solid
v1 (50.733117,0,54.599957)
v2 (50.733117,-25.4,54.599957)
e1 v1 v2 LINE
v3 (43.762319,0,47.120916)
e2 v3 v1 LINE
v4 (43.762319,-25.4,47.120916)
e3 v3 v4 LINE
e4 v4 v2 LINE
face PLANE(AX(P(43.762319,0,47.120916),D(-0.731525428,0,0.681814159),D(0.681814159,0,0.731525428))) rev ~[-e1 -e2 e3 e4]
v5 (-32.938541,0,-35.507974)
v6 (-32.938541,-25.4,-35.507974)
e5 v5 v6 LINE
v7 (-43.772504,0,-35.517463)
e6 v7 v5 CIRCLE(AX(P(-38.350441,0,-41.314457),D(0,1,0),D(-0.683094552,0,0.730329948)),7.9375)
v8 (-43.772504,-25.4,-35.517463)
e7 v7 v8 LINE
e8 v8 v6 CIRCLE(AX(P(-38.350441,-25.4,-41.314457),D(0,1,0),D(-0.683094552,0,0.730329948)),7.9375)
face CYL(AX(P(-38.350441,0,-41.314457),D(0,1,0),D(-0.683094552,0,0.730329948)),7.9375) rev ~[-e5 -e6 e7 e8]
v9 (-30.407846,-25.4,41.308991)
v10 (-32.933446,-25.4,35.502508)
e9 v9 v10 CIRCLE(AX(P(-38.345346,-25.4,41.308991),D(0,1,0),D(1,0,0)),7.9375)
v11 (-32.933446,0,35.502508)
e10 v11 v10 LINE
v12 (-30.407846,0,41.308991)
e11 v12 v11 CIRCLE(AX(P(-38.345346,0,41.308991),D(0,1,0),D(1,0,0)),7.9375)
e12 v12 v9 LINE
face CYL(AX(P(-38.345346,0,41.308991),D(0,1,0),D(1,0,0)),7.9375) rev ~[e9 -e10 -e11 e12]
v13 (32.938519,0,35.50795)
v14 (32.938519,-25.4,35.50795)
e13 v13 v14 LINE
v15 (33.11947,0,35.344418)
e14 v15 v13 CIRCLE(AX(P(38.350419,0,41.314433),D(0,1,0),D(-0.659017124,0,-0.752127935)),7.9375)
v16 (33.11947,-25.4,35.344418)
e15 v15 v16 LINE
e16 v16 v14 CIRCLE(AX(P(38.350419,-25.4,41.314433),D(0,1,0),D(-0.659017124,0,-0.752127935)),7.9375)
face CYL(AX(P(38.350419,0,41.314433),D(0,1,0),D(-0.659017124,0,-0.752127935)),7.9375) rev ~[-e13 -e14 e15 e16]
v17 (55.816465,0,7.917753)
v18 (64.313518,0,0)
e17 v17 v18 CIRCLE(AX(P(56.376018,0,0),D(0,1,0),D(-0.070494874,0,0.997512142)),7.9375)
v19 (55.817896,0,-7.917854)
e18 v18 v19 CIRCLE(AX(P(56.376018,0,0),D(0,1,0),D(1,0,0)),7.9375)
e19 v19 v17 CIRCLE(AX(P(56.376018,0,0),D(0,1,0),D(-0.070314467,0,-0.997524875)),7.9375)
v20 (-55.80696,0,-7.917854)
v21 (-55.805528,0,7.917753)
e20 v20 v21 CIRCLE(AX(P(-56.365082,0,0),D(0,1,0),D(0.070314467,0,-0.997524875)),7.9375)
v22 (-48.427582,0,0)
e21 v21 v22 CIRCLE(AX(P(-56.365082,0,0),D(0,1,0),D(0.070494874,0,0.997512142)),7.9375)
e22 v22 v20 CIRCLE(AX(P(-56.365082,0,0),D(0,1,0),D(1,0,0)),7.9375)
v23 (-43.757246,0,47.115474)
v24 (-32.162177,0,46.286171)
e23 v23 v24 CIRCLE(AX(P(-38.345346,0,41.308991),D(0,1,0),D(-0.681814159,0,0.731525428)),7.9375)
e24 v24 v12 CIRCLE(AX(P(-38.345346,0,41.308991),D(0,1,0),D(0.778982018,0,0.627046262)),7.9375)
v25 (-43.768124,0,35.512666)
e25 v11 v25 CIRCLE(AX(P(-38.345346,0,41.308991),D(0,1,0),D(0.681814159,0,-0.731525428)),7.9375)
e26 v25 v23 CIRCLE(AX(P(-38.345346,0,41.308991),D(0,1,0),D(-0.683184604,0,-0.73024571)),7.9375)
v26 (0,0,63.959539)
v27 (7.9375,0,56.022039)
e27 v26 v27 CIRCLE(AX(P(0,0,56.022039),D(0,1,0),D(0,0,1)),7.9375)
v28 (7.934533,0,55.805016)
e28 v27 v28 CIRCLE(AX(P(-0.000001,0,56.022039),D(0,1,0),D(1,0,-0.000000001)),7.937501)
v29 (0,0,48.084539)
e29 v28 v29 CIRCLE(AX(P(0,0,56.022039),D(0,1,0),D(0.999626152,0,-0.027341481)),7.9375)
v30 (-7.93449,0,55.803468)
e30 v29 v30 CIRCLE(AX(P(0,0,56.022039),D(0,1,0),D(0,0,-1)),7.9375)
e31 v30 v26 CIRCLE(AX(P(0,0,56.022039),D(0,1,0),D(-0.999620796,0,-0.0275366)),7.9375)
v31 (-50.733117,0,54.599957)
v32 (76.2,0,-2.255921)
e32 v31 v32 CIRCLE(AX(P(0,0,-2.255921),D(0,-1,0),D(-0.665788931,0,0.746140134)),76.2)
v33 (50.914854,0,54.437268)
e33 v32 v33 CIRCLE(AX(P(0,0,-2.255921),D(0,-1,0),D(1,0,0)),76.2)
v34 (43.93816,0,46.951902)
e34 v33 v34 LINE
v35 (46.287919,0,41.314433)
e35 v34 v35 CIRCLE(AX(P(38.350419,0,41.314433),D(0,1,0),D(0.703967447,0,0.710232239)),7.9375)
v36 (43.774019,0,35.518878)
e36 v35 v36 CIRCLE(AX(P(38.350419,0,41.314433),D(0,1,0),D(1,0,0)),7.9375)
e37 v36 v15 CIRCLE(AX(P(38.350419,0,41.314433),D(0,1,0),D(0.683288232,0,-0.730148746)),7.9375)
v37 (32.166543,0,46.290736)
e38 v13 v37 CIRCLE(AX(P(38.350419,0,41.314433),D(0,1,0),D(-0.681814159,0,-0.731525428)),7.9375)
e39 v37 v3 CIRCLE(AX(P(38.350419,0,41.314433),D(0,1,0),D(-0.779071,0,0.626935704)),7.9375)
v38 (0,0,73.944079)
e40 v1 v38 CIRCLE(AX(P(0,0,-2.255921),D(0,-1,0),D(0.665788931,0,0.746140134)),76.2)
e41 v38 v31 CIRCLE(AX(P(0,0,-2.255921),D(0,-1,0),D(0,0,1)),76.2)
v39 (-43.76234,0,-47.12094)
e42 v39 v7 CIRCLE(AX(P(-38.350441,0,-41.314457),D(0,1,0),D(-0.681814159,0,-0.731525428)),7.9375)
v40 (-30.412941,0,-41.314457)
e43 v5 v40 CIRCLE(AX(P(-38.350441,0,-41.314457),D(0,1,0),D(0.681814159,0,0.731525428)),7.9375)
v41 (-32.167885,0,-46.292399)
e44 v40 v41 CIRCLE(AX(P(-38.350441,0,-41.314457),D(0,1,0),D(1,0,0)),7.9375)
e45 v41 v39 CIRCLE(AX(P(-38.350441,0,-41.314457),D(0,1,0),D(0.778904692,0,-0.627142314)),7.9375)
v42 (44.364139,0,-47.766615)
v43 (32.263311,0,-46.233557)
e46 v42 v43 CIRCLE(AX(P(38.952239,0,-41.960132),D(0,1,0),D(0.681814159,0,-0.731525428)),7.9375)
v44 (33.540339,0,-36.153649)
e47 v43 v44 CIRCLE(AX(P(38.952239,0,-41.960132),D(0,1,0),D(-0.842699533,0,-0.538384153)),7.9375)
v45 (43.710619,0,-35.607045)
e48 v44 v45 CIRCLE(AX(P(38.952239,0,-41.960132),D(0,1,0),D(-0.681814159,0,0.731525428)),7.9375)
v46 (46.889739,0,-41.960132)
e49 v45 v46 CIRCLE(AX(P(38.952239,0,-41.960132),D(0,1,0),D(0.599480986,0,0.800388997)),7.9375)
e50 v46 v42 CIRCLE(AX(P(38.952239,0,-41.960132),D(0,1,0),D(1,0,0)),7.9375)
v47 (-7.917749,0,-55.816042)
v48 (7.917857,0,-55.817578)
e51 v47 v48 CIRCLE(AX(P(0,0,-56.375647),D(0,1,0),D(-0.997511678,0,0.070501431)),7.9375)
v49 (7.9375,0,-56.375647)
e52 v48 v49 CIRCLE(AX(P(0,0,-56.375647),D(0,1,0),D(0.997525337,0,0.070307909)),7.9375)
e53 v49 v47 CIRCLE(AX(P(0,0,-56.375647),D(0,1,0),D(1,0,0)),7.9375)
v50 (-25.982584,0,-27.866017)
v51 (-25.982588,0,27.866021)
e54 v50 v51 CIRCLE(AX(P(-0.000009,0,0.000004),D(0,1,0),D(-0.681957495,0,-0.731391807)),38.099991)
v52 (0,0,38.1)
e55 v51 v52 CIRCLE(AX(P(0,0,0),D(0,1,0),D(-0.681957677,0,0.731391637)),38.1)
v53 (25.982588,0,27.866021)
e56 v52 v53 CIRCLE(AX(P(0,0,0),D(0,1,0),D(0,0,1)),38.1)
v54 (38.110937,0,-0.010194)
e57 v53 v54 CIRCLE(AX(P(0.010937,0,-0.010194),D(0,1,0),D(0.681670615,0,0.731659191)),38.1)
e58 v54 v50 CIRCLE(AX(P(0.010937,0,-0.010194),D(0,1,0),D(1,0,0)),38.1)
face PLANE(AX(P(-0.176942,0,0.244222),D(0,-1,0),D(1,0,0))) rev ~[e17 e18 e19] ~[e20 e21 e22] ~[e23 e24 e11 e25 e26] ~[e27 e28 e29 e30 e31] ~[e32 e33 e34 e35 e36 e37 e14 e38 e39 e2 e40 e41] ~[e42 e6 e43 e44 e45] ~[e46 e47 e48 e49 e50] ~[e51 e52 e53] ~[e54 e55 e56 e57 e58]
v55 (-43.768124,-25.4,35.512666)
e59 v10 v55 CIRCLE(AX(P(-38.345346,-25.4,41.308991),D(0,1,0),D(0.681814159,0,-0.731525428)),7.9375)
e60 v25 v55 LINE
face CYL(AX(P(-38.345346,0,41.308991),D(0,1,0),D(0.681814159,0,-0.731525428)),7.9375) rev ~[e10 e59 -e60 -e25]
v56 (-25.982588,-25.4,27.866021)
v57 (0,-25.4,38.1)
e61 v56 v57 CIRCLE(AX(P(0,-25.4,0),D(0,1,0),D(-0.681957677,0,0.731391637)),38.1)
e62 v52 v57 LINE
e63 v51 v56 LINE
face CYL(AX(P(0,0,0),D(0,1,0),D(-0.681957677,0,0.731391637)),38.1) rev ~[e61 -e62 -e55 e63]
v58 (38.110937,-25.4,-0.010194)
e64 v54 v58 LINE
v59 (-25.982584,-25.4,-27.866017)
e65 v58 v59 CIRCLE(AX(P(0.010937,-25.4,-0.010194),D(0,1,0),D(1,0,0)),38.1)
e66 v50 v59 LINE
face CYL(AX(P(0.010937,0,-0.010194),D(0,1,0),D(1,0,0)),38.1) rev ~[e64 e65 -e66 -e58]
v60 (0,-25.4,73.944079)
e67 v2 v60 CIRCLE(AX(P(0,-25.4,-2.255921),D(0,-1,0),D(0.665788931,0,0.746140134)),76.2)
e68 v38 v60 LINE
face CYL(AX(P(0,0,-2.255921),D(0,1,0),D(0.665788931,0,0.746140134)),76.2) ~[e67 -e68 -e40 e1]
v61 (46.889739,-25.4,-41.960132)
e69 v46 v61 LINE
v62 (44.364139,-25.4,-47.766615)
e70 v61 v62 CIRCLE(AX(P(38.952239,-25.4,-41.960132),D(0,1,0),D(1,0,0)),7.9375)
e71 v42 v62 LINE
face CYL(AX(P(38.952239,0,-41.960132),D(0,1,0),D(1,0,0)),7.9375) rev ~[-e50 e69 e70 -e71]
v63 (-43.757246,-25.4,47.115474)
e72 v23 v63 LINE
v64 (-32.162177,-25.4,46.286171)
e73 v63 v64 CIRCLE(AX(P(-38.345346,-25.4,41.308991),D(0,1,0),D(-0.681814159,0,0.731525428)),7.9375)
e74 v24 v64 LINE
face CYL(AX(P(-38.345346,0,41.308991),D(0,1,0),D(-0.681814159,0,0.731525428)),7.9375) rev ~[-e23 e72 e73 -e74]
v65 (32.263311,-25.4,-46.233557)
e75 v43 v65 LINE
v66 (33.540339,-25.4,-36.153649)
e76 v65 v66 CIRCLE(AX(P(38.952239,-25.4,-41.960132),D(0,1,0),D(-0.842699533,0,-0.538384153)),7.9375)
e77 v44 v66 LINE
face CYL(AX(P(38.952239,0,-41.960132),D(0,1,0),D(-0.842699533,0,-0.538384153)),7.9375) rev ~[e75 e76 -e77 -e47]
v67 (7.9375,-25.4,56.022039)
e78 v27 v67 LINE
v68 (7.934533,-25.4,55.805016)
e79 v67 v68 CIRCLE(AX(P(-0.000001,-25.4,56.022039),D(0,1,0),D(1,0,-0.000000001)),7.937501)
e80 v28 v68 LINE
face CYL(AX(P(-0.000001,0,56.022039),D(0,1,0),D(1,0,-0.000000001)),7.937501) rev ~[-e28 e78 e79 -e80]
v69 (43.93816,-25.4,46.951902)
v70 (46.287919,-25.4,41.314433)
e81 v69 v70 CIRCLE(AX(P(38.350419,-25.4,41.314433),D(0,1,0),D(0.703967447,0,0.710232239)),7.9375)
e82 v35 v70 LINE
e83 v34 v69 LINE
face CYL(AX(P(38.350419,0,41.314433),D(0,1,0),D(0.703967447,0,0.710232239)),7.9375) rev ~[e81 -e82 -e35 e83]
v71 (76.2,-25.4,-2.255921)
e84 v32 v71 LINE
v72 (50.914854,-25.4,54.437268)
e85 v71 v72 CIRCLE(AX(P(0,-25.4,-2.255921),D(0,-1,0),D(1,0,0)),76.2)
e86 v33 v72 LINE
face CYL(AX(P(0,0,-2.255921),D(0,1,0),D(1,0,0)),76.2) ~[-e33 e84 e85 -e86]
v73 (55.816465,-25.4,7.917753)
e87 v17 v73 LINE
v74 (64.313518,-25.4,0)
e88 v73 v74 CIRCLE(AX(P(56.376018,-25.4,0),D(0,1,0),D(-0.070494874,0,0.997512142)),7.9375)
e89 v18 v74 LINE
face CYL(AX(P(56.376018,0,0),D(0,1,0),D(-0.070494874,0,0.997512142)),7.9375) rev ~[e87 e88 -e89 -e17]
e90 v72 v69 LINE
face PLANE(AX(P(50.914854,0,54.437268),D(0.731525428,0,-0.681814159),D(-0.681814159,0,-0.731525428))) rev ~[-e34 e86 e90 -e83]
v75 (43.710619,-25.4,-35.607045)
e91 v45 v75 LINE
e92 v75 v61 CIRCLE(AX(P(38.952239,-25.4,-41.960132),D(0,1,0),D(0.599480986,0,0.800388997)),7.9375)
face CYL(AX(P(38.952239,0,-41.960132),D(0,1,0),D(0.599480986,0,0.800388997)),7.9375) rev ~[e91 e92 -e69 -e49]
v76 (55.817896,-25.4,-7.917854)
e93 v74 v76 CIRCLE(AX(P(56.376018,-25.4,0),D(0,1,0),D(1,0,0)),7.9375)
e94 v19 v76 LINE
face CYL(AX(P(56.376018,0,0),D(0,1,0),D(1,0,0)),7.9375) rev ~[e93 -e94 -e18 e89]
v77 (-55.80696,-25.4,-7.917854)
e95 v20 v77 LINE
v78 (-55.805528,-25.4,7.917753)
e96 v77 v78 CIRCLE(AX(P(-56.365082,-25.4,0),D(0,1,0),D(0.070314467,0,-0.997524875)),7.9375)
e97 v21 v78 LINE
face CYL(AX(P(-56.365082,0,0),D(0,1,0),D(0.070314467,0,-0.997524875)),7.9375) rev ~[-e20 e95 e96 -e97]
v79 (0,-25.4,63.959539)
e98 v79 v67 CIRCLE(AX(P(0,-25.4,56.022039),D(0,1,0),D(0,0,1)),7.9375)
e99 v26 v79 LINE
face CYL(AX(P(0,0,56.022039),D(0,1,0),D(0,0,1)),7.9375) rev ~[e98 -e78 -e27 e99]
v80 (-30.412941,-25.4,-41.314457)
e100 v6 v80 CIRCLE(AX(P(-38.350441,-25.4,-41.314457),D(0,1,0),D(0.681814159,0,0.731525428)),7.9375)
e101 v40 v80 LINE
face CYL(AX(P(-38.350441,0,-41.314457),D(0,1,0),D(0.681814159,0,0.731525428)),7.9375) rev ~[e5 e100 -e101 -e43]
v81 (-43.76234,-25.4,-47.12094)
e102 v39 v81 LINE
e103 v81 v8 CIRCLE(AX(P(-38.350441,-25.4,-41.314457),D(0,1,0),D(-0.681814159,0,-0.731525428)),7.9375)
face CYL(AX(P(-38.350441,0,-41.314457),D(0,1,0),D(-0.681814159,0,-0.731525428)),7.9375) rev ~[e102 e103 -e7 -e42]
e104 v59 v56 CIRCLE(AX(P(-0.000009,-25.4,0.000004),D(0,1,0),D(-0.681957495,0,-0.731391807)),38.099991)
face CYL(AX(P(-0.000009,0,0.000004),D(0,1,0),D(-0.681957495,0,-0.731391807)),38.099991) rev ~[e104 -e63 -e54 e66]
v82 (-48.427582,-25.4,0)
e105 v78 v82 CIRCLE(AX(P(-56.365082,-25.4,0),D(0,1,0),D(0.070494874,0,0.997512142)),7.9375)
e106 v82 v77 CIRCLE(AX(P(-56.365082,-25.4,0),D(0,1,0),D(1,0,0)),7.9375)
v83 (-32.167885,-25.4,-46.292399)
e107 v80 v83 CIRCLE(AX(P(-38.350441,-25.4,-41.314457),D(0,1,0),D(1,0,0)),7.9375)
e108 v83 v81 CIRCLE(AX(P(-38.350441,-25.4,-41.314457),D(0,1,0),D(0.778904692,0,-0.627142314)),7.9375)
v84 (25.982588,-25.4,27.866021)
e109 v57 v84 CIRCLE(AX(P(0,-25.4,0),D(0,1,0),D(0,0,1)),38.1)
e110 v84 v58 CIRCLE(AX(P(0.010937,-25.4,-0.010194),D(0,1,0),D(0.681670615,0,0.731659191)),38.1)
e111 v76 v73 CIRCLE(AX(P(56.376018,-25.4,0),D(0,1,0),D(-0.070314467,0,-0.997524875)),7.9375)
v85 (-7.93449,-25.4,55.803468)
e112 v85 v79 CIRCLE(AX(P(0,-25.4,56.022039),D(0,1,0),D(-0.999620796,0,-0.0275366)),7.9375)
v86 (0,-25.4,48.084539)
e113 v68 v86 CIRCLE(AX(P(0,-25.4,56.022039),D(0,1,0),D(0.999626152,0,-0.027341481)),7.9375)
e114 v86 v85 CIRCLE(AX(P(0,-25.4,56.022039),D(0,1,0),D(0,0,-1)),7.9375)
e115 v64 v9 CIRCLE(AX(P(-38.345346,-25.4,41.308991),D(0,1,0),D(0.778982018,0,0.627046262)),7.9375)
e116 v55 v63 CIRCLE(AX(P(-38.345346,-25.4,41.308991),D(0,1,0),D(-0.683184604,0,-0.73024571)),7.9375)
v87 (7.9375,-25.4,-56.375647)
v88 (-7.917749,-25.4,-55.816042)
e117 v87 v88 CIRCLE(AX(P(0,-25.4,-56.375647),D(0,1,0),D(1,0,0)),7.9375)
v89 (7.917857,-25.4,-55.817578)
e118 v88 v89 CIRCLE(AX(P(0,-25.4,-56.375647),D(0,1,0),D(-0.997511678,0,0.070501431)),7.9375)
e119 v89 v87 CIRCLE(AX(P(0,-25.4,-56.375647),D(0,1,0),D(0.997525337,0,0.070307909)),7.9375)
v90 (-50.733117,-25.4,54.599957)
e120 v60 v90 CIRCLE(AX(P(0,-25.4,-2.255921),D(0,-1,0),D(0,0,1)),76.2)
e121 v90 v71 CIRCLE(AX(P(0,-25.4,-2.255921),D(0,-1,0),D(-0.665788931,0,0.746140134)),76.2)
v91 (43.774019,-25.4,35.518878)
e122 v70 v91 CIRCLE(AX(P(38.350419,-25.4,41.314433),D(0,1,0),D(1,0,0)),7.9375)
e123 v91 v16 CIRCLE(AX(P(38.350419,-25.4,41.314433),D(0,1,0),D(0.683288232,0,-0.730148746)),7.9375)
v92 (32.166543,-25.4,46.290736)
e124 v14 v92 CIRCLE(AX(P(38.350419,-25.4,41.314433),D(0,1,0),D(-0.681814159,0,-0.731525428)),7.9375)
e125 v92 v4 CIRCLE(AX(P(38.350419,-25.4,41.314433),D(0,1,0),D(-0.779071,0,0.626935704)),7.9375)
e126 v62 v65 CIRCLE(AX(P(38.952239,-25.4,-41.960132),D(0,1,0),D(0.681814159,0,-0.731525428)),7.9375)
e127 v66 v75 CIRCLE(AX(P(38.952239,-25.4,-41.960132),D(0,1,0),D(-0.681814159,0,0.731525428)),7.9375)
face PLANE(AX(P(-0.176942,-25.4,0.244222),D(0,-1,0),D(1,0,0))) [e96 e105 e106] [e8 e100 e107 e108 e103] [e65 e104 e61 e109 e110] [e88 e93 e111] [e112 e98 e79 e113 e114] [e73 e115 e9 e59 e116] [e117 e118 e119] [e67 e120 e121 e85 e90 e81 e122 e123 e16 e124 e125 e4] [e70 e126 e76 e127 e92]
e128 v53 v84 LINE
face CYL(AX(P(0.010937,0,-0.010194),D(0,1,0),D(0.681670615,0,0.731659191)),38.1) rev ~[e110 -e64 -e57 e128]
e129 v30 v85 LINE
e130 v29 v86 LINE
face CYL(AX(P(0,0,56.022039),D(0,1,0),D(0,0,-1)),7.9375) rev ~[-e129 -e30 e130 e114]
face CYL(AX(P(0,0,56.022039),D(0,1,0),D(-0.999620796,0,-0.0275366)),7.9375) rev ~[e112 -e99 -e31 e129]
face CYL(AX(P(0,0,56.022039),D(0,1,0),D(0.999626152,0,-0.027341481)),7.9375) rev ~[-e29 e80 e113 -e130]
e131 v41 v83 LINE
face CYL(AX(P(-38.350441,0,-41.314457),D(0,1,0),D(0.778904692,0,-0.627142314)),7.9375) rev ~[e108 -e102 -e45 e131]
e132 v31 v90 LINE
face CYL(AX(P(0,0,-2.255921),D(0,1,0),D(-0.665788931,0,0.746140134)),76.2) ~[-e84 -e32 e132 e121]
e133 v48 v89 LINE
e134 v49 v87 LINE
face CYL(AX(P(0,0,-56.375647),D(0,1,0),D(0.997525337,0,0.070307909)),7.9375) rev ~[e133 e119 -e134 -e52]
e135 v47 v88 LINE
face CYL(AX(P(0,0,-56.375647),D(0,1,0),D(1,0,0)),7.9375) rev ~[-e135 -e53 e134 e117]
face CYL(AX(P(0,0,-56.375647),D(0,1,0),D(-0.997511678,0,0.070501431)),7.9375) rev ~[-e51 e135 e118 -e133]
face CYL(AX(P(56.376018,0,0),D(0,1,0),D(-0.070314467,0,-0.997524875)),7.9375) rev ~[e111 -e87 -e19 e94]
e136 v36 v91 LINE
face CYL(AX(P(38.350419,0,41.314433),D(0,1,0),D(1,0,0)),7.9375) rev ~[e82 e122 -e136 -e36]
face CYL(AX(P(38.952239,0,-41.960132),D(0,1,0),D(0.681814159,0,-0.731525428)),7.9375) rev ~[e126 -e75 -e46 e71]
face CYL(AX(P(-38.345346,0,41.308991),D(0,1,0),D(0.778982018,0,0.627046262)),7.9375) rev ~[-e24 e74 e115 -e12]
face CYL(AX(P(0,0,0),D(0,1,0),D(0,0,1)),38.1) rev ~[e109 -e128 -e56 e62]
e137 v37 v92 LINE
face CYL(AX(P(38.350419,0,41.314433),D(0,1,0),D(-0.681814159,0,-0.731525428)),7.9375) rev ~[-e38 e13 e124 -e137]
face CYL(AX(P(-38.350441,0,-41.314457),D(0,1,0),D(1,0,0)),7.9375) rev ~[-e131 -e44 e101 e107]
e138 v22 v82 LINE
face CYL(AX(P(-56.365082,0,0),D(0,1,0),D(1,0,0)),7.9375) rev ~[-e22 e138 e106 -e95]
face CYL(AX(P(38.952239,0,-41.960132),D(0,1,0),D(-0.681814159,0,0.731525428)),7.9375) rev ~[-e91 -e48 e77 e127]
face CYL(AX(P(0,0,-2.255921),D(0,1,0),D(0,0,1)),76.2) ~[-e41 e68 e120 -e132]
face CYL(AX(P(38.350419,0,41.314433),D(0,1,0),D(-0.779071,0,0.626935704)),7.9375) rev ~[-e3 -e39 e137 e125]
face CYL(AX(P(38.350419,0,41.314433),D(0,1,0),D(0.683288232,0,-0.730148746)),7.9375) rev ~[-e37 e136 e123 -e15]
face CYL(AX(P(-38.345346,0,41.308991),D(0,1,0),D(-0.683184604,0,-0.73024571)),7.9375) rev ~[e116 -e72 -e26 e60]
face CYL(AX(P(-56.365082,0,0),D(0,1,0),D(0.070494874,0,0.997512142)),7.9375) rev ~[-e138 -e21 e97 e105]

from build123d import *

# Parameters (mm, degrees)
F1_DEPTH = 25.4


# Not quite as in the source:
# - ends of sketch curves that miss each other by under 0.0002 mm in the source are joined


with BuildPart() as f1:
    # F0 (on Front) → F1 (new body)
    with BuildSketch(Plane.XZ):
        with BuildLine():
            ThreePointArc((7.9345325801, 55.8050164826), (5.535399088, 50.3331676174), (0, 48.0845394904))
            ThreePointArc((0, 48.0845394904), (-5.53484385, 50.3326274112), (-7.9344900677, 55.8034677281))
            ThreePointArc((-7.9344900677, 55.8034677281), (-20.6052011609, 52.4624086595), (-32.1621766165, 46.2861708383))
            ThreePointArc((-32.1621766165, 46.2861708383), (-30.8592654267, 43.9476457313), (-30.4078463876, 41.3089911317))
            ThreePointArc((-30.4078463876, 41.3089911317), (-31.0665806395, 38.1430038554), (-32.9334464969, 35.5025080461))
            ThreePointArc((-32.9334464969, 35.5025080461), (-38.3527879746, 33.37149462), (-43.7681241803, 35.5126658077))
            ThreePointArc((-43.7681241803, 35.5126658077), (-51.6631141521, 22.5336801806), (-55.8055284532, 7.9177526246))
            ThreePointArc((-55.8055284532, 7.9177526246), (-50.5579583584, 5.4112130729), (-48.4275815127, 0))
            ThreePointArc((-48.4275815127, 0), (-50.5584477046, -5.4117381745), (-55.8069604277, -7.917853693))
            ThreePointArc((-55.8069604277, -7.917853693), (-51.6665413057, -22.5360169357), (-43.772503534, -35.5174627239))
            ThreePointArc((-43.772503534, -35.5174627239), (-38.3573927277, -33.3769597298), (-32.9385406353, -35.5079735997))
            ThreePointArc((-32.9385406353, -35.5079735997), (-31.0716747779, -38.1484694089), (-30.412940526, -41.3144566852))
            ThreePointArc((-30.412940526, -41.3144566852), (-30.8645222652, -43.9535728332), (-32.1678845367, -46.2923987991))
            ThreePointArc((-32.1678845367, -46.2923987991), (-20.6005666804, -52.4744238707), (-7.9177489459, -55.8160418449))
            ThreePointArc((-7.9177489459, -55.8160418449), (0.0007699496, -48.4381469932), (7.917857362, -55.8175779229))
            ThreePointArc((7.917857362, -55.8175779229), (20.6543242596, -52.4575865986), (32.263311311, -46.2335565237))
            ThreePointArc((32.263311311, -46.2335565237), (31.0776824279, -40.9625014731), (33.540338967, -36.1536492228))
            ThreePointArc((33.540338967, -36.1536492228), (38.5262504819, -34.0340714863), (43.7106191867, -35.607044642))
            ThreePointArc((43.7106191867, -35.607044642), (51.6543788303, -22.5889167608), (55.8178964863, -7.917853693))
            ThreePointArc((55.8178964863, -7.917853693), (48.4385176038, -0.0007177684), (55.8164645119, 7.9177526246))
            ThreePointArc((55.8164645119, 7.9177526246), (51.6724507462, 22.537346487), (43.7740191713, 35.5188777315))
            ThreePointArc((43.7740191713, 35.5188777315), (38.4803716898, 33.3779972711), (33.1194704023, 35.3444179256))
            ThreePointArc((33.1194704023, 35.3444179256), (33.0283665185, 35.4254890622), (32.9385189369, 35.5079503192))
            ThreePointArc((32.9385189369, 35.5079503192), (30.4331832399, 40.7476116526), (32.166542765, 46.2907355552))
            ThreePointArc((32.166542765, 46.2907355552), (20.6072932493, 52.4658819521), (7.9345325801, 55.8050164826))
        make_face()
        with BuildLine():
            ThreePointArc((0, 38.1), (13.962710806, 35.4492976933), (25.9825875048, 27.8660213621))
            ThreePointArc((25.9825875048, 27.8660213621), (34.9475216227, 15.1899725896), (38.1109370587, -0.010193824))
            ThreePointArc((38.1109370587, -0.010193824), (15.1973926464, -34.9527404783), (-25.9825835021, -27.8660170726))
            ThreePointArc((-25.9825835021, -27.8660170726), (-38.1, 0), (-25.9825875048, 27.8660213621))
            ThreePointArc((-25.9825875048, 27.8660213621), (-13.962710806, 35.4492976933), (0, 38.1))
        make_face(mode=Mode.SUBTRACT)
        with BuildLine():
            ThreePointArc((-32.1621766165, 46.2861708383), (-20.6052011609, 52.4624086595), (-7.9344900677, 55.8034677281))
            ThreePointArc((-7.9344900677, 55.8034677281), (-5.6894120792, 61.5568833403), (0, 63.9595394904))
            Line((0, 63.9595394904), (0, 73.9440789808))
            ThreePointArc((0, 73.9440789808), (-27.1479472531, 68.9440014522), (-50.7331165271, 54.5999571944))
            Line((-50.7331165271, 54.5999571944), (-43.7572462783, 47.1154742172))
            ThreePointArc((-43.7572462783, 47.1154742172), (-37.7790864379, 49.2262669207), (-32.1621766165, 46.2861708383))
        make_face()
        with BuildLine():
            ThreePointArc((7.9375, 56.0220394904), (7.9367581103, 55.9135178434), (7.9345325801, 55.8050164826))
            ThreePointArc((7.9345325801, 55.8050164826), (20.6072932493, 52.4658819521), (32.166542765, 46.2907355552))
            ThreePointArc((32.166542765, 46.2907355552), (37.7835970754, 49.2316689925), (43.7623187183, 47.1209164903))
            Line((43.7623187183, 47.1209164903), (50.7331165271, 54.5999571944))
            ThreePointArc((50.7331165271, 54.5999571944), (27.1479472531, 68.9440014522), (0, 73.9440789808))
            Line((0, 73.9440789808), (0, 63.9595394904))
            ThreePointArc((0, 63.9595394904), (5.6126600757, 61.634699566), (7.9375, 56.0220394904))
        make_face()
        with BuildLine():
            ThreePointArc((-43.7681241803, 35.5126658077), (-46.2828428993, 41.3164327187), (-43.7572462783, 47.1154742172))
            Line((-43.7572462783, 47.1154742172), (-50.7331165271, 54.5999571944))
            ThreePointArc((-50.7331165271, 54.5999571944), (-31.1494504015, -71.7983666167), (76.2, -2.2559210192))
            ThreePointArc((76.2, -2.2559210192), (69.5922116943, 28.7821857449), (50.9148537664, 54.4372678657))
            Line((50.9148537664, 54.4372678657), (43.9381604406, 46.9519018008))
            ThreePointArc((43.9381604406, 46.9519018008), (45.6769666267, 44.3682185312), (46.2879188276, 41.3144334048))
            ThreePointArc((46.2879188276, 41.3144334048), (45.6323737155, 38.1557882425), (43.7740191713, 35.5188777315))
            ThreePointArc((43.7740191713, 35.5188777315), (51.6724507462, 22.537346487), (55.8164645119, 7.9177526246))
            ThreePointArc((55.8164645119, 7.9177526246), (61.7872306442, 5.8071231544), (64.3135175714, 0))
            ThreePointArc((64.3135175714, 0), (61.7877557458, -5.8066338081), (55.8178964863, -7.917853693))
            ThreePointArc((55.8178964863, -7.917853693), (51.6543788303, -22.5889167608), (43.7106191867, -35.607044642))
            ThreePointArc((43.7106191867, -35.607044642), (46.0506031098, -38.4080721744), (46.8897388577, -41.9601323083))
            ThreePointArc((46.8897388577, -41.9601323083), (46.2310046059, -45.1261195846), (44.3641387485, -47.7666153939))
            ThreePointArc((44.3641387485, -47.7666153939), (37.9546080225, -49.8346887381), (32.263311311, -46.2335565237))
            ThreePointArc((32.263311311, -46.2335565237), (20.6543242596, -52.4575865986), (7.917857362, -55.8175779229))
            ThreePointArc((7.917857362, -55.8175779229), (7.9325878205, -56.0964396499), (7.9375, -56.3756469558))
            ThreePointArc((7.9375, -56.3756469558), (-0.2799767777, -64.3082076555), (-7.9177489459, -55.8160418449))
            ThreePointArc((-7.9177489459, -55.8160418449), (-20.6005666804, -52.4744238707), (-32.1678845367, -46.2923987991))
            ThreePointArc((-32.1678845367, -46.2923987991), (-37.784668716, -49.2317673719), (-43.7623404168, -47.1209397708))
            ThreePointArc((-43.7623404168, -47.1209397708), (-46.2879374814, -41.3214088869), (-43.772503534, -35.5174627239))
            ThreePointArc((-43.772503534, -35.5174627239), (-51.6665413057, -22.5360169357), (-55.8069604277, -7.917853693))
            ThreePointArc((-55.8069604277, -7.917853693), (-64.3025814803, 0.0007177684), (-55.8055284532, 7.9177526246))
            ThreePointArc((-55.8055284532, 7.9177526246), (-51.6631141521, 22.5336801806), (-43.7681241803, 35.5126658077))
        make_face()
    extrude(amount=F1_DEPTH)


solid = f1.part
